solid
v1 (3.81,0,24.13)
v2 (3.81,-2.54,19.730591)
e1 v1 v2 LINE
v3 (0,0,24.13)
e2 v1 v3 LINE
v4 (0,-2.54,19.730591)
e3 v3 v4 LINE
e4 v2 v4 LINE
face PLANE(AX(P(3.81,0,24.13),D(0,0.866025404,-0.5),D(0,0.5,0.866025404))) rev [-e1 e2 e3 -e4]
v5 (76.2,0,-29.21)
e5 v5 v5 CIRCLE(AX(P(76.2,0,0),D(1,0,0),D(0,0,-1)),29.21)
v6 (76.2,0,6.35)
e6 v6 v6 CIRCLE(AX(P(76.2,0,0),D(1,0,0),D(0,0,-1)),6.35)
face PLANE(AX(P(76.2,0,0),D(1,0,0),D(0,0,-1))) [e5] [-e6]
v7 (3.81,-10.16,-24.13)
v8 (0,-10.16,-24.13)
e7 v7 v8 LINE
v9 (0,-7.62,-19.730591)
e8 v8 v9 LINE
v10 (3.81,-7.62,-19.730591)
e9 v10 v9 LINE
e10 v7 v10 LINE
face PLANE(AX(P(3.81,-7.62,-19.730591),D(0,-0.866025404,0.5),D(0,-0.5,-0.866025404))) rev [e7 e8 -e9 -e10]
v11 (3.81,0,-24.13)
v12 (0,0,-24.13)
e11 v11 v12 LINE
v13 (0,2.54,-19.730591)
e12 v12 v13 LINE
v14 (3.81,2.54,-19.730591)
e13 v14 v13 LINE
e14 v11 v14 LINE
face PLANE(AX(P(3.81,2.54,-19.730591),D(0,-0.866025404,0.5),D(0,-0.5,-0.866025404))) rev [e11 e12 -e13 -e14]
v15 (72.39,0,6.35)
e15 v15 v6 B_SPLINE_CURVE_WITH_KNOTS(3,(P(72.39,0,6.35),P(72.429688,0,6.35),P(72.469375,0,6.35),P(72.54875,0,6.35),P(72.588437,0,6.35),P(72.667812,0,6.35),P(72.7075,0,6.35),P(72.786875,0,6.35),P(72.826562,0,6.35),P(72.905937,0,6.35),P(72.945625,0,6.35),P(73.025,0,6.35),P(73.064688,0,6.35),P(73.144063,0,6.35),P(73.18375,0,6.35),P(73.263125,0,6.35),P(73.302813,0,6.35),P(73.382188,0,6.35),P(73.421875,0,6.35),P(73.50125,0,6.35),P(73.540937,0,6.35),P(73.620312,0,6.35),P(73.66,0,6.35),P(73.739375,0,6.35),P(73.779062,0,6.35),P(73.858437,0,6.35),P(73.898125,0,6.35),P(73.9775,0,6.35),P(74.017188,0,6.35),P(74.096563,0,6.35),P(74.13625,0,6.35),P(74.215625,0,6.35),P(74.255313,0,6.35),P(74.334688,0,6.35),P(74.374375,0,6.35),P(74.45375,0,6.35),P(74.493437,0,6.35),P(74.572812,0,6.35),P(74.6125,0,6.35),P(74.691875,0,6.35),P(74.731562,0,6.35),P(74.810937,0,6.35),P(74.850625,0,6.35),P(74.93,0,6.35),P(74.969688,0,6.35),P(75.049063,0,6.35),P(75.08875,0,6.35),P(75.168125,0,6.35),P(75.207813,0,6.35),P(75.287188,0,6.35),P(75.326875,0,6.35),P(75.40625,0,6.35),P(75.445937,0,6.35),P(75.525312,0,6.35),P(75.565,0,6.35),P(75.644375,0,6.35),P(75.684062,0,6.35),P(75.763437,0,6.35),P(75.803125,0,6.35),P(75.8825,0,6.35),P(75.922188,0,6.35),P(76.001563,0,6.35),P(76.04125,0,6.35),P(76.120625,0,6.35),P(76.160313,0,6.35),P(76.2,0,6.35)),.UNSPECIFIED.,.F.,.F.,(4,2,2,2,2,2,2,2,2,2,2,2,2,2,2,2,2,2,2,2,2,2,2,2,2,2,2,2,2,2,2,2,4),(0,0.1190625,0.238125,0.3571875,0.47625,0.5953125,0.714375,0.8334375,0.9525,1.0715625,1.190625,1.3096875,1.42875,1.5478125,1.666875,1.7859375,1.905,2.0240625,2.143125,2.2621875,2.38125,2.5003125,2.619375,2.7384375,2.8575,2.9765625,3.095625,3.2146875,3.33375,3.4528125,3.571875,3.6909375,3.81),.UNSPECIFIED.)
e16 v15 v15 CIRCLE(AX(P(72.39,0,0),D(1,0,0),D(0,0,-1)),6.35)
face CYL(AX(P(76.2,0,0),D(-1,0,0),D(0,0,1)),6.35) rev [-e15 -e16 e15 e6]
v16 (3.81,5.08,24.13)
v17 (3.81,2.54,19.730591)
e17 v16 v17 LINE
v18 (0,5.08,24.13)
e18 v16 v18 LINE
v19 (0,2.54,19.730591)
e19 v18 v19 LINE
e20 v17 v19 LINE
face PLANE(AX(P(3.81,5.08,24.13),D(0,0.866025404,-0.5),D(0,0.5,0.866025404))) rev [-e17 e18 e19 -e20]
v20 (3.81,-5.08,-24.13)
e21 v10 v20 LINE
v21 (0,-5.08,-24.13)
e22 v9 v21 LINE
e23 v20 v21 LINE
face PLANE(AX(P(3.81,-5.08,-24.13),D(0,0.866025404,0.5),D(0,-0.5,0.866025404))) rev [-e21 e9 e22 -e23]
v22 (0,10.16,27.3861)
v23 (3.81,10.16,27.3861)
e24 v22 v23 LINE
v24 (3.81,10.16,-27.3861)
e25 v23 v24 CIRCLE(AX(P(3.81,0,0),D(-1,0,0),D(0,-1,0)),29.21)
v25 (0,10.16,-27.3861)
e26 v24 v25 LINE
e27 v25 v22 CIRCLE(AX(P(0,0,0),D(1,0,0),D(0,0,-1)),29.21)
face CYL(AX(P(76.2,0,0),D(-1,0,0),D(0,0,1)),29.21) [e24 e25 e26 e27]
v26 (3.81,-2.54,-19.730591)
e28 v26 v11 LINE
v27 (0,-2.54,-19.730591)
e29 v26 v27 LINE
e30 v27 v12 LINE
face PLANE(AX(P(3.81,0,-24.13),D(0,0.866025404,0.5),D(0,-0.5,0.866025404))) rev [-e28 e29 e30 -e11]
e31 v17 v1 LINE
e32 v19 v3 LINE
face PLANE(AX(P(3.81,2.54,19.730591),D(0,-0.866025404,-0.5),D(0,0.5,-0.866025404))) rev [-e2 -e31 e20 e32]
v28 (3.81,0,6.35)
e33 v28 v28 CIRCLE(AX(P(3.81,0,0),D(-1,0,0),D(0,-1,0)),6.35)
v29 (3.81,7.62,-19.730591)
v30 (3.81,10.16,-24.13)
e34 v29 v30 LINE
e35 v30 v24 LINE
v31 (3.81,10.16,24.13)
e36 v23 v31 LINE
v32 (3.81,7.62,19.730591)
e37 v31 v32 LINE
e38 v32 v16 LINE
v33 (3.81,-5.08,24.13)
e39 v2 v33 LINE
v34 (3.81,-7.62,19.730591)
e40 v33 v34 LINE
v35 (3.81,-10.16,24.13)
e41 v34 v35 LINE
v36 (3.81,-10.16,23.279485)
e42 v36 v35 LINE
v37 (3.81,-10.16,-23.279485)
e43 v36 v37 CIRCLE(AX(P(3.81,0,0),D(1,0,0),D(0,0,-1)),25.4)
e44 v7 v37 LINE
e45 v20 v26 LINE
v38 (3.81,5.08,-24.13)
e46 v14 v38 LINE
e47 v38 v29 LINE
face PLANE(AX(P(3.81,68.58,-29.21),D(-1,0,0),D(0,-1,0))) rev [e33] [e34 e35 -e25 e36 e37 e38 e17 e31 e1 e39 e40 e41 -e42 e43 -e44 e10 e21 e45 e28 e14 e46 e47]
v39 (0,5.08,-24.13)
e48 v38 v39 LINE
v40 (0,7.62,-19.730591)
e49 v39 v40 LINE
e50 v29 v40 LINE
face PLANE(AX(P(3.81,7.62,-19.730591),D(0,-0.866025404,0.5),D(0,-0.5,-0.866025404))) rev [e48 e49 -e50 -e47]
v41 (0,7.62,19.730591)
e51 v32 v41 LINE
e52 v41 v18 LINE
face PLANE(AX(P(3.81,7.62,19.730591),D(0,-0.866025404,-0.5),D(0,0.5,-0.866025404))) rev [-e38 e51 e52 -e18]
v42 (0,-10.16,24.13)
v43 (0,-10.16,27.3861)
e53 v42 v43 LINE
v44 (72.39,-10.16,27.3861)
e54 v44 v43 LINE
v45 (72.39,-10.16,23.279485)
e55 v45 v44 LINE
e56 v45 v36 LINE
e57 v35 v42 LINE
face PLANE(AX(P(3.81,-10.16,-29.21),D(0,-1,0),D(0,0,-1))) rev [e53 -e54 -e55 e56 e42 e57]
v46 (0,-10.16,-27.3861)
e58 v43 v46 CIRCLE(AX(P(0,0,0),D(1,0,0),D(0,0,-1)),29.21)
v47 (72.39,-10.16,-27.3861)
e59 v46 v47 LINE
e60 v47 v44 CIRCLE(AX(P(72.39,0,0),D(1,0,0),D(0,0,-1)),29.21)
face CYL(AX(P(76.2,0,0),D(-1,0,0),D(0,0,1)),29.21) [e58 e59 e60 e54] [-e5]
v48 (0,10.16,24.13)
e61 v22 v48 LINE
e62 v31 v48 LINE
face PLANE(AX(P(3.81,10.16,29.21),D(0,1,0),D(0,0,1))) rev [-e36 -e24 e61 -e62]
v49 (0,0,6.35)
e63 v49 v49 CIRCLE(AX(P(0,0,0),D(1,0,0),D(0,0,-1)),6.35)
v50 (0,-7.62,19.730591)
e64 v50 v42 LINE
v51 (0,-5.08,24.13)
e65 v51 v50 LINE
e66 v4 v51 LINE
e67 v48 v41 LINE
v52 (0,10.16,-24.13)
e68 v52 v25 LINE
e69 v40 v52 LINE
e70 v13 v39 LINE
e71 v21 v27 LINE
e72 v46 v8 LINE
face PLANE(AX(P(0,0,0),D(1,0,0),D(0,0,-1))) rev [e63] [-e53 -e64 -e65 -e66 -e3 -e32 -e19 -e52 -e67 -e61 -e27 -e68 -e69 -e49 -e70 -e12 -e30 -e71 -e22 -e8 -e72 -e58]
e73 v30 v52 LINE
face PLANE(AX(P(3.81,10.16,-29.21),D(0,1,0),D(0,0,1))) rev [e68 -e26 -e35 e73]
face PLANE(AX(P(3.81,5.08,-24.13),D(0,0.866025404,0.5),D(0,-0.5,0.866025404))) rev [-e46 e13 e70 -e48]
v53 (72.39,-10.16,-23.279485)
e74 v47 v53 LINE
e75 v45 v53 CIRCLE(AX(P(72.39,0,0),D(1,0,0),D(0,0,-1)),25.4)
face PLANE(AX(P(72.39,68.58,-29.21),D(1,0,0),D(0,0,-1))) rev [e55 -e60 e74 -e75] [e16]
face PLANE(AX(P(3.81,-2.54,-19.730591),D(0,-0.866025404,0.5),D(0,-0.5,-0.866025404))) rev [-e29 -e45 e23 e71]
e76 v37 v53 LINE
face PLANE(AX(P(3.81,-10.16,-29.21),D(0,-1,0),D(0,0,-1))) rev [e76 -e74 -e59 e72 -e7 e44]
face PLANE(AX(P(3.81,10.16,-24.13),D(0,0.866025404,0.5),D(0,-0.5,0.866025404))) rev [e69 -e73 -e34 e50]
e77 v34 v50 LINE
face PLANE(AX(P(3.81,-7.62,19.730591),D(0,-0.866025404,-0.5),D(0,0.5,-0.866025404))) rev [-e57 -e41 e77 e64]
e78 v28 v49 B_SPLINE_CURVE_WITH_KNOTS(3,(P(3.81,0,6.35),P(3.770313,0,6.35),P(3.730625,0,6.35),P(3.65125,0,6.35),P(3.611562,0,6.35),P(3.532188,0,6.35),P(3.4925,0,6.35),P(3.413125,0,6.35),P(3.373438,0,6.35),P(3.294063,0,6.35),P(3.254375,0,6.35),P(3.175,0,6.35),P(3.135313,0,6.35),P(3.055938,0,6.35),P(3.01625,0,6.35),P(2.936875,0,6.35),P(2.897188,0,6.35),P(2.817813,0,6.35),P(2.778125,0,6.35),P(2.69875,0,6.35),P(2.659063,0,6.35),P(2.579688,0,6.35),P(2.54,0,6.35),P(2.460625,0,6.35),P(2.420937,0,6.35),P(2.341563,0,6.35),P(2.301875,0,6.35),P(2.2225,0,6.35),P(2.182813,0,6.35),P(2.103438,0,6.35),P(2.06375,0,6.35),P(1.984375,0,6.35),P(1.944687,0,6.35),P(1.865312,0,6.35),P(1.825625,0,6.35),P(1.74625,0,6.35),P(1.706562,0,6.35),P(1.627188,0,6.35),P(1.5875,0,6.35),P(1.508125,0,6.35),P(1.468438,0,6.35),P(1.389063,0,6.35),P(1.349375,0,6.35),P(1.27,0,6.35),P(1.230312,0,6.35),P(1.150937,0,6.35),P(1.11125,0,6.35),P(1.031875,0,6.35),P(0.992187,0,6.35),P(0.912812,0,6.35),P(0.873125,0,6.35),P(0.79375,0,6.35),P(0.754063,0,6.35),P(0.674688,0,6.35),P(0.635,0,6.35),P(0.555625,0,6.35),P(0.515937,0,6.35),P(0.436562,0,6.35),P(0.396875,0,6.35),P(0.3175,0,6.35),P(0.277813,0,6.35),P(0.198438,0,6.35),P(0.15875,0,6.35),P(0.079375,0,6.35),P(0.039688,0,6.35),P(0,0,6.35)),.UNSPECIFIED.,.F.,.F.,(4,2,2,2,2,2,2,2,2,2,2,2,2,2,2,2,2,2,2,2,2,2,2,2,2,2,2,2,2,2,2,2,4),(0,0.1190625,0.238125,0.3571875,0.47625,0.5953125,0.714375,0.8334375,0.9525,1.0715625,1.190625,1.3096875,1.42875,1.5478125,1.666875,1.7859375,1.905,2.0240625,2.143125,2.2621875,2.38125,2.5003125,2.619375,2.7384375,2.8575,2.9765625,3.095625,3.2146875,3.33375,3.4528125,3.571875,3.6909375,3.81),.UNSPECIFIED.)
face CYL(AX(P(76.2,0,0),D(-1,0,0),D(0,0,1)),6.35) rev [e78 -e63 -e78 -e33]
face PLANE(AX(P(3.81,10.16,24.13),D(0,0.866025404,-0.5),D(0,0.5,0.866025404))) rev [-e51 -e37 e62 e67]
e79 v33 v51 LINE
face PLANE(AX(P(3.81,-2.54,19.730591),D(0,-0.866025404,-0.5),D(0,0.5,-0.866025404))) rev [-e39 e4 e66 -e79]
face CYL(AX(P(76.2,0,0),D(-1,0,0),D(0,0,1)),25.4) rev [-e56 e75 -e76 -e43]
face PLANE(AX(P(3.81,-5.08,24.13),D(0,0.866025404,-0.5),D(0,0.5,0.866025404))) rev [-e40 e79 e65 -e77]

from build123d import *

# Parameters (mm, degrees)
SKETCH3_R               = 29.21
SKETCH3_R_2             = 6.35
BOSS_EXTRUDE1_DEPTH     = 76.2
CUT_EXTRUDE1_DEPTH      = 87.676918496
CUT_EXTRUDE1_DEPTH_BACK = 87.676918496
SKETCH4_W               = 68.58
SKETCH4_H               = 78.74
SHELL4_START            = 3.81
SHELL4_DEPTH            = 68.58
CUT_EXTRUDE2_DEPTH      = 3.81


# Read off the part's stored shape, not the designer's step: Shell4
with BuildPart() as part:
    # Sketch3 → Boss-Extrude1 (new body)
    with BuildSketch(Plane(origin=(0, 0, 0), x_dir=(0, 0, -1), z_dir=(1, 0, 0))):
        with Locations(Location((0, 0, 0), (0, 0, 180))):
            Circle(SKETCH3_R)
        with Locations(Location((0, 0, 0), (0, 0, 180))):
            Circle(SKETCH3_R_2, mode=Mode.SUBTRACT)
    extrude(amount=BOSS_EXTRUDE1_DEPTH)

    # Sketch4 → Cut-Extrude1 (cut, two sides: drawn at the far end of the back side and taken through both)
    with BuildSketch(Plane.XY.offset(-CUT_EXTRUDE1_DEPTH_BACK)):
        with Locations((38.1, 29.21)):
            Rectangle(SKETCH4_W, SKETCH4_H)
    extrude(amount=CUT_EXTRUDE1_DEPTH + CUT_EXTRUDE1_DEPTH_BACK, mode=Mode.SUBTRACT)

    # Shell4 outline → Shell4 (cut)
    with BuildSketch(Plane.YZ.offset(SHELL4_START)):
        with BuildLine():
            ThreePointArc((-10.16, 23.27948453), (-25.4, 0), (-10.16, -23.27948453))
            Line((-10.16, -23.27948453), (-10.16, 23.27948453))
        make_face()
    extrude(amount=SHELL4_DEPTH, mode=Mode.SUBTRACT)

    # Sketch5 → Cut-Extrude2 (cut)
    with BuildSketch(Plane.ZY):
        Polygon((24.13, 10.16), (19.730590949, 7.62), (24.13, 5.08), (19.730590949, 2.54), (24.13, 0), (19.730590949, -2.54), (24.13, -5.08), (19.730590949, -7.62), (24.13, -10.16), (29.21, -10.16), (29.21, 10.16), align=None)
        Polygon((-29.21, 10.16), (-24.13, 10.16), (-19.730590949, 7.62), (-24.13, 5.08), (-19.730590949, 2.54), (-24.13, 0), (-19.730590949, -2.54), (-24.13, -5.08), (-19.730590949, -7.62), (-24.13, -10.16), (-29.21, -10.16), align=None)
    extrude(amount=-CUT_EXTRUDE2_DEPTH, mode=Mode.SUBTRACT)


solid = part.part
